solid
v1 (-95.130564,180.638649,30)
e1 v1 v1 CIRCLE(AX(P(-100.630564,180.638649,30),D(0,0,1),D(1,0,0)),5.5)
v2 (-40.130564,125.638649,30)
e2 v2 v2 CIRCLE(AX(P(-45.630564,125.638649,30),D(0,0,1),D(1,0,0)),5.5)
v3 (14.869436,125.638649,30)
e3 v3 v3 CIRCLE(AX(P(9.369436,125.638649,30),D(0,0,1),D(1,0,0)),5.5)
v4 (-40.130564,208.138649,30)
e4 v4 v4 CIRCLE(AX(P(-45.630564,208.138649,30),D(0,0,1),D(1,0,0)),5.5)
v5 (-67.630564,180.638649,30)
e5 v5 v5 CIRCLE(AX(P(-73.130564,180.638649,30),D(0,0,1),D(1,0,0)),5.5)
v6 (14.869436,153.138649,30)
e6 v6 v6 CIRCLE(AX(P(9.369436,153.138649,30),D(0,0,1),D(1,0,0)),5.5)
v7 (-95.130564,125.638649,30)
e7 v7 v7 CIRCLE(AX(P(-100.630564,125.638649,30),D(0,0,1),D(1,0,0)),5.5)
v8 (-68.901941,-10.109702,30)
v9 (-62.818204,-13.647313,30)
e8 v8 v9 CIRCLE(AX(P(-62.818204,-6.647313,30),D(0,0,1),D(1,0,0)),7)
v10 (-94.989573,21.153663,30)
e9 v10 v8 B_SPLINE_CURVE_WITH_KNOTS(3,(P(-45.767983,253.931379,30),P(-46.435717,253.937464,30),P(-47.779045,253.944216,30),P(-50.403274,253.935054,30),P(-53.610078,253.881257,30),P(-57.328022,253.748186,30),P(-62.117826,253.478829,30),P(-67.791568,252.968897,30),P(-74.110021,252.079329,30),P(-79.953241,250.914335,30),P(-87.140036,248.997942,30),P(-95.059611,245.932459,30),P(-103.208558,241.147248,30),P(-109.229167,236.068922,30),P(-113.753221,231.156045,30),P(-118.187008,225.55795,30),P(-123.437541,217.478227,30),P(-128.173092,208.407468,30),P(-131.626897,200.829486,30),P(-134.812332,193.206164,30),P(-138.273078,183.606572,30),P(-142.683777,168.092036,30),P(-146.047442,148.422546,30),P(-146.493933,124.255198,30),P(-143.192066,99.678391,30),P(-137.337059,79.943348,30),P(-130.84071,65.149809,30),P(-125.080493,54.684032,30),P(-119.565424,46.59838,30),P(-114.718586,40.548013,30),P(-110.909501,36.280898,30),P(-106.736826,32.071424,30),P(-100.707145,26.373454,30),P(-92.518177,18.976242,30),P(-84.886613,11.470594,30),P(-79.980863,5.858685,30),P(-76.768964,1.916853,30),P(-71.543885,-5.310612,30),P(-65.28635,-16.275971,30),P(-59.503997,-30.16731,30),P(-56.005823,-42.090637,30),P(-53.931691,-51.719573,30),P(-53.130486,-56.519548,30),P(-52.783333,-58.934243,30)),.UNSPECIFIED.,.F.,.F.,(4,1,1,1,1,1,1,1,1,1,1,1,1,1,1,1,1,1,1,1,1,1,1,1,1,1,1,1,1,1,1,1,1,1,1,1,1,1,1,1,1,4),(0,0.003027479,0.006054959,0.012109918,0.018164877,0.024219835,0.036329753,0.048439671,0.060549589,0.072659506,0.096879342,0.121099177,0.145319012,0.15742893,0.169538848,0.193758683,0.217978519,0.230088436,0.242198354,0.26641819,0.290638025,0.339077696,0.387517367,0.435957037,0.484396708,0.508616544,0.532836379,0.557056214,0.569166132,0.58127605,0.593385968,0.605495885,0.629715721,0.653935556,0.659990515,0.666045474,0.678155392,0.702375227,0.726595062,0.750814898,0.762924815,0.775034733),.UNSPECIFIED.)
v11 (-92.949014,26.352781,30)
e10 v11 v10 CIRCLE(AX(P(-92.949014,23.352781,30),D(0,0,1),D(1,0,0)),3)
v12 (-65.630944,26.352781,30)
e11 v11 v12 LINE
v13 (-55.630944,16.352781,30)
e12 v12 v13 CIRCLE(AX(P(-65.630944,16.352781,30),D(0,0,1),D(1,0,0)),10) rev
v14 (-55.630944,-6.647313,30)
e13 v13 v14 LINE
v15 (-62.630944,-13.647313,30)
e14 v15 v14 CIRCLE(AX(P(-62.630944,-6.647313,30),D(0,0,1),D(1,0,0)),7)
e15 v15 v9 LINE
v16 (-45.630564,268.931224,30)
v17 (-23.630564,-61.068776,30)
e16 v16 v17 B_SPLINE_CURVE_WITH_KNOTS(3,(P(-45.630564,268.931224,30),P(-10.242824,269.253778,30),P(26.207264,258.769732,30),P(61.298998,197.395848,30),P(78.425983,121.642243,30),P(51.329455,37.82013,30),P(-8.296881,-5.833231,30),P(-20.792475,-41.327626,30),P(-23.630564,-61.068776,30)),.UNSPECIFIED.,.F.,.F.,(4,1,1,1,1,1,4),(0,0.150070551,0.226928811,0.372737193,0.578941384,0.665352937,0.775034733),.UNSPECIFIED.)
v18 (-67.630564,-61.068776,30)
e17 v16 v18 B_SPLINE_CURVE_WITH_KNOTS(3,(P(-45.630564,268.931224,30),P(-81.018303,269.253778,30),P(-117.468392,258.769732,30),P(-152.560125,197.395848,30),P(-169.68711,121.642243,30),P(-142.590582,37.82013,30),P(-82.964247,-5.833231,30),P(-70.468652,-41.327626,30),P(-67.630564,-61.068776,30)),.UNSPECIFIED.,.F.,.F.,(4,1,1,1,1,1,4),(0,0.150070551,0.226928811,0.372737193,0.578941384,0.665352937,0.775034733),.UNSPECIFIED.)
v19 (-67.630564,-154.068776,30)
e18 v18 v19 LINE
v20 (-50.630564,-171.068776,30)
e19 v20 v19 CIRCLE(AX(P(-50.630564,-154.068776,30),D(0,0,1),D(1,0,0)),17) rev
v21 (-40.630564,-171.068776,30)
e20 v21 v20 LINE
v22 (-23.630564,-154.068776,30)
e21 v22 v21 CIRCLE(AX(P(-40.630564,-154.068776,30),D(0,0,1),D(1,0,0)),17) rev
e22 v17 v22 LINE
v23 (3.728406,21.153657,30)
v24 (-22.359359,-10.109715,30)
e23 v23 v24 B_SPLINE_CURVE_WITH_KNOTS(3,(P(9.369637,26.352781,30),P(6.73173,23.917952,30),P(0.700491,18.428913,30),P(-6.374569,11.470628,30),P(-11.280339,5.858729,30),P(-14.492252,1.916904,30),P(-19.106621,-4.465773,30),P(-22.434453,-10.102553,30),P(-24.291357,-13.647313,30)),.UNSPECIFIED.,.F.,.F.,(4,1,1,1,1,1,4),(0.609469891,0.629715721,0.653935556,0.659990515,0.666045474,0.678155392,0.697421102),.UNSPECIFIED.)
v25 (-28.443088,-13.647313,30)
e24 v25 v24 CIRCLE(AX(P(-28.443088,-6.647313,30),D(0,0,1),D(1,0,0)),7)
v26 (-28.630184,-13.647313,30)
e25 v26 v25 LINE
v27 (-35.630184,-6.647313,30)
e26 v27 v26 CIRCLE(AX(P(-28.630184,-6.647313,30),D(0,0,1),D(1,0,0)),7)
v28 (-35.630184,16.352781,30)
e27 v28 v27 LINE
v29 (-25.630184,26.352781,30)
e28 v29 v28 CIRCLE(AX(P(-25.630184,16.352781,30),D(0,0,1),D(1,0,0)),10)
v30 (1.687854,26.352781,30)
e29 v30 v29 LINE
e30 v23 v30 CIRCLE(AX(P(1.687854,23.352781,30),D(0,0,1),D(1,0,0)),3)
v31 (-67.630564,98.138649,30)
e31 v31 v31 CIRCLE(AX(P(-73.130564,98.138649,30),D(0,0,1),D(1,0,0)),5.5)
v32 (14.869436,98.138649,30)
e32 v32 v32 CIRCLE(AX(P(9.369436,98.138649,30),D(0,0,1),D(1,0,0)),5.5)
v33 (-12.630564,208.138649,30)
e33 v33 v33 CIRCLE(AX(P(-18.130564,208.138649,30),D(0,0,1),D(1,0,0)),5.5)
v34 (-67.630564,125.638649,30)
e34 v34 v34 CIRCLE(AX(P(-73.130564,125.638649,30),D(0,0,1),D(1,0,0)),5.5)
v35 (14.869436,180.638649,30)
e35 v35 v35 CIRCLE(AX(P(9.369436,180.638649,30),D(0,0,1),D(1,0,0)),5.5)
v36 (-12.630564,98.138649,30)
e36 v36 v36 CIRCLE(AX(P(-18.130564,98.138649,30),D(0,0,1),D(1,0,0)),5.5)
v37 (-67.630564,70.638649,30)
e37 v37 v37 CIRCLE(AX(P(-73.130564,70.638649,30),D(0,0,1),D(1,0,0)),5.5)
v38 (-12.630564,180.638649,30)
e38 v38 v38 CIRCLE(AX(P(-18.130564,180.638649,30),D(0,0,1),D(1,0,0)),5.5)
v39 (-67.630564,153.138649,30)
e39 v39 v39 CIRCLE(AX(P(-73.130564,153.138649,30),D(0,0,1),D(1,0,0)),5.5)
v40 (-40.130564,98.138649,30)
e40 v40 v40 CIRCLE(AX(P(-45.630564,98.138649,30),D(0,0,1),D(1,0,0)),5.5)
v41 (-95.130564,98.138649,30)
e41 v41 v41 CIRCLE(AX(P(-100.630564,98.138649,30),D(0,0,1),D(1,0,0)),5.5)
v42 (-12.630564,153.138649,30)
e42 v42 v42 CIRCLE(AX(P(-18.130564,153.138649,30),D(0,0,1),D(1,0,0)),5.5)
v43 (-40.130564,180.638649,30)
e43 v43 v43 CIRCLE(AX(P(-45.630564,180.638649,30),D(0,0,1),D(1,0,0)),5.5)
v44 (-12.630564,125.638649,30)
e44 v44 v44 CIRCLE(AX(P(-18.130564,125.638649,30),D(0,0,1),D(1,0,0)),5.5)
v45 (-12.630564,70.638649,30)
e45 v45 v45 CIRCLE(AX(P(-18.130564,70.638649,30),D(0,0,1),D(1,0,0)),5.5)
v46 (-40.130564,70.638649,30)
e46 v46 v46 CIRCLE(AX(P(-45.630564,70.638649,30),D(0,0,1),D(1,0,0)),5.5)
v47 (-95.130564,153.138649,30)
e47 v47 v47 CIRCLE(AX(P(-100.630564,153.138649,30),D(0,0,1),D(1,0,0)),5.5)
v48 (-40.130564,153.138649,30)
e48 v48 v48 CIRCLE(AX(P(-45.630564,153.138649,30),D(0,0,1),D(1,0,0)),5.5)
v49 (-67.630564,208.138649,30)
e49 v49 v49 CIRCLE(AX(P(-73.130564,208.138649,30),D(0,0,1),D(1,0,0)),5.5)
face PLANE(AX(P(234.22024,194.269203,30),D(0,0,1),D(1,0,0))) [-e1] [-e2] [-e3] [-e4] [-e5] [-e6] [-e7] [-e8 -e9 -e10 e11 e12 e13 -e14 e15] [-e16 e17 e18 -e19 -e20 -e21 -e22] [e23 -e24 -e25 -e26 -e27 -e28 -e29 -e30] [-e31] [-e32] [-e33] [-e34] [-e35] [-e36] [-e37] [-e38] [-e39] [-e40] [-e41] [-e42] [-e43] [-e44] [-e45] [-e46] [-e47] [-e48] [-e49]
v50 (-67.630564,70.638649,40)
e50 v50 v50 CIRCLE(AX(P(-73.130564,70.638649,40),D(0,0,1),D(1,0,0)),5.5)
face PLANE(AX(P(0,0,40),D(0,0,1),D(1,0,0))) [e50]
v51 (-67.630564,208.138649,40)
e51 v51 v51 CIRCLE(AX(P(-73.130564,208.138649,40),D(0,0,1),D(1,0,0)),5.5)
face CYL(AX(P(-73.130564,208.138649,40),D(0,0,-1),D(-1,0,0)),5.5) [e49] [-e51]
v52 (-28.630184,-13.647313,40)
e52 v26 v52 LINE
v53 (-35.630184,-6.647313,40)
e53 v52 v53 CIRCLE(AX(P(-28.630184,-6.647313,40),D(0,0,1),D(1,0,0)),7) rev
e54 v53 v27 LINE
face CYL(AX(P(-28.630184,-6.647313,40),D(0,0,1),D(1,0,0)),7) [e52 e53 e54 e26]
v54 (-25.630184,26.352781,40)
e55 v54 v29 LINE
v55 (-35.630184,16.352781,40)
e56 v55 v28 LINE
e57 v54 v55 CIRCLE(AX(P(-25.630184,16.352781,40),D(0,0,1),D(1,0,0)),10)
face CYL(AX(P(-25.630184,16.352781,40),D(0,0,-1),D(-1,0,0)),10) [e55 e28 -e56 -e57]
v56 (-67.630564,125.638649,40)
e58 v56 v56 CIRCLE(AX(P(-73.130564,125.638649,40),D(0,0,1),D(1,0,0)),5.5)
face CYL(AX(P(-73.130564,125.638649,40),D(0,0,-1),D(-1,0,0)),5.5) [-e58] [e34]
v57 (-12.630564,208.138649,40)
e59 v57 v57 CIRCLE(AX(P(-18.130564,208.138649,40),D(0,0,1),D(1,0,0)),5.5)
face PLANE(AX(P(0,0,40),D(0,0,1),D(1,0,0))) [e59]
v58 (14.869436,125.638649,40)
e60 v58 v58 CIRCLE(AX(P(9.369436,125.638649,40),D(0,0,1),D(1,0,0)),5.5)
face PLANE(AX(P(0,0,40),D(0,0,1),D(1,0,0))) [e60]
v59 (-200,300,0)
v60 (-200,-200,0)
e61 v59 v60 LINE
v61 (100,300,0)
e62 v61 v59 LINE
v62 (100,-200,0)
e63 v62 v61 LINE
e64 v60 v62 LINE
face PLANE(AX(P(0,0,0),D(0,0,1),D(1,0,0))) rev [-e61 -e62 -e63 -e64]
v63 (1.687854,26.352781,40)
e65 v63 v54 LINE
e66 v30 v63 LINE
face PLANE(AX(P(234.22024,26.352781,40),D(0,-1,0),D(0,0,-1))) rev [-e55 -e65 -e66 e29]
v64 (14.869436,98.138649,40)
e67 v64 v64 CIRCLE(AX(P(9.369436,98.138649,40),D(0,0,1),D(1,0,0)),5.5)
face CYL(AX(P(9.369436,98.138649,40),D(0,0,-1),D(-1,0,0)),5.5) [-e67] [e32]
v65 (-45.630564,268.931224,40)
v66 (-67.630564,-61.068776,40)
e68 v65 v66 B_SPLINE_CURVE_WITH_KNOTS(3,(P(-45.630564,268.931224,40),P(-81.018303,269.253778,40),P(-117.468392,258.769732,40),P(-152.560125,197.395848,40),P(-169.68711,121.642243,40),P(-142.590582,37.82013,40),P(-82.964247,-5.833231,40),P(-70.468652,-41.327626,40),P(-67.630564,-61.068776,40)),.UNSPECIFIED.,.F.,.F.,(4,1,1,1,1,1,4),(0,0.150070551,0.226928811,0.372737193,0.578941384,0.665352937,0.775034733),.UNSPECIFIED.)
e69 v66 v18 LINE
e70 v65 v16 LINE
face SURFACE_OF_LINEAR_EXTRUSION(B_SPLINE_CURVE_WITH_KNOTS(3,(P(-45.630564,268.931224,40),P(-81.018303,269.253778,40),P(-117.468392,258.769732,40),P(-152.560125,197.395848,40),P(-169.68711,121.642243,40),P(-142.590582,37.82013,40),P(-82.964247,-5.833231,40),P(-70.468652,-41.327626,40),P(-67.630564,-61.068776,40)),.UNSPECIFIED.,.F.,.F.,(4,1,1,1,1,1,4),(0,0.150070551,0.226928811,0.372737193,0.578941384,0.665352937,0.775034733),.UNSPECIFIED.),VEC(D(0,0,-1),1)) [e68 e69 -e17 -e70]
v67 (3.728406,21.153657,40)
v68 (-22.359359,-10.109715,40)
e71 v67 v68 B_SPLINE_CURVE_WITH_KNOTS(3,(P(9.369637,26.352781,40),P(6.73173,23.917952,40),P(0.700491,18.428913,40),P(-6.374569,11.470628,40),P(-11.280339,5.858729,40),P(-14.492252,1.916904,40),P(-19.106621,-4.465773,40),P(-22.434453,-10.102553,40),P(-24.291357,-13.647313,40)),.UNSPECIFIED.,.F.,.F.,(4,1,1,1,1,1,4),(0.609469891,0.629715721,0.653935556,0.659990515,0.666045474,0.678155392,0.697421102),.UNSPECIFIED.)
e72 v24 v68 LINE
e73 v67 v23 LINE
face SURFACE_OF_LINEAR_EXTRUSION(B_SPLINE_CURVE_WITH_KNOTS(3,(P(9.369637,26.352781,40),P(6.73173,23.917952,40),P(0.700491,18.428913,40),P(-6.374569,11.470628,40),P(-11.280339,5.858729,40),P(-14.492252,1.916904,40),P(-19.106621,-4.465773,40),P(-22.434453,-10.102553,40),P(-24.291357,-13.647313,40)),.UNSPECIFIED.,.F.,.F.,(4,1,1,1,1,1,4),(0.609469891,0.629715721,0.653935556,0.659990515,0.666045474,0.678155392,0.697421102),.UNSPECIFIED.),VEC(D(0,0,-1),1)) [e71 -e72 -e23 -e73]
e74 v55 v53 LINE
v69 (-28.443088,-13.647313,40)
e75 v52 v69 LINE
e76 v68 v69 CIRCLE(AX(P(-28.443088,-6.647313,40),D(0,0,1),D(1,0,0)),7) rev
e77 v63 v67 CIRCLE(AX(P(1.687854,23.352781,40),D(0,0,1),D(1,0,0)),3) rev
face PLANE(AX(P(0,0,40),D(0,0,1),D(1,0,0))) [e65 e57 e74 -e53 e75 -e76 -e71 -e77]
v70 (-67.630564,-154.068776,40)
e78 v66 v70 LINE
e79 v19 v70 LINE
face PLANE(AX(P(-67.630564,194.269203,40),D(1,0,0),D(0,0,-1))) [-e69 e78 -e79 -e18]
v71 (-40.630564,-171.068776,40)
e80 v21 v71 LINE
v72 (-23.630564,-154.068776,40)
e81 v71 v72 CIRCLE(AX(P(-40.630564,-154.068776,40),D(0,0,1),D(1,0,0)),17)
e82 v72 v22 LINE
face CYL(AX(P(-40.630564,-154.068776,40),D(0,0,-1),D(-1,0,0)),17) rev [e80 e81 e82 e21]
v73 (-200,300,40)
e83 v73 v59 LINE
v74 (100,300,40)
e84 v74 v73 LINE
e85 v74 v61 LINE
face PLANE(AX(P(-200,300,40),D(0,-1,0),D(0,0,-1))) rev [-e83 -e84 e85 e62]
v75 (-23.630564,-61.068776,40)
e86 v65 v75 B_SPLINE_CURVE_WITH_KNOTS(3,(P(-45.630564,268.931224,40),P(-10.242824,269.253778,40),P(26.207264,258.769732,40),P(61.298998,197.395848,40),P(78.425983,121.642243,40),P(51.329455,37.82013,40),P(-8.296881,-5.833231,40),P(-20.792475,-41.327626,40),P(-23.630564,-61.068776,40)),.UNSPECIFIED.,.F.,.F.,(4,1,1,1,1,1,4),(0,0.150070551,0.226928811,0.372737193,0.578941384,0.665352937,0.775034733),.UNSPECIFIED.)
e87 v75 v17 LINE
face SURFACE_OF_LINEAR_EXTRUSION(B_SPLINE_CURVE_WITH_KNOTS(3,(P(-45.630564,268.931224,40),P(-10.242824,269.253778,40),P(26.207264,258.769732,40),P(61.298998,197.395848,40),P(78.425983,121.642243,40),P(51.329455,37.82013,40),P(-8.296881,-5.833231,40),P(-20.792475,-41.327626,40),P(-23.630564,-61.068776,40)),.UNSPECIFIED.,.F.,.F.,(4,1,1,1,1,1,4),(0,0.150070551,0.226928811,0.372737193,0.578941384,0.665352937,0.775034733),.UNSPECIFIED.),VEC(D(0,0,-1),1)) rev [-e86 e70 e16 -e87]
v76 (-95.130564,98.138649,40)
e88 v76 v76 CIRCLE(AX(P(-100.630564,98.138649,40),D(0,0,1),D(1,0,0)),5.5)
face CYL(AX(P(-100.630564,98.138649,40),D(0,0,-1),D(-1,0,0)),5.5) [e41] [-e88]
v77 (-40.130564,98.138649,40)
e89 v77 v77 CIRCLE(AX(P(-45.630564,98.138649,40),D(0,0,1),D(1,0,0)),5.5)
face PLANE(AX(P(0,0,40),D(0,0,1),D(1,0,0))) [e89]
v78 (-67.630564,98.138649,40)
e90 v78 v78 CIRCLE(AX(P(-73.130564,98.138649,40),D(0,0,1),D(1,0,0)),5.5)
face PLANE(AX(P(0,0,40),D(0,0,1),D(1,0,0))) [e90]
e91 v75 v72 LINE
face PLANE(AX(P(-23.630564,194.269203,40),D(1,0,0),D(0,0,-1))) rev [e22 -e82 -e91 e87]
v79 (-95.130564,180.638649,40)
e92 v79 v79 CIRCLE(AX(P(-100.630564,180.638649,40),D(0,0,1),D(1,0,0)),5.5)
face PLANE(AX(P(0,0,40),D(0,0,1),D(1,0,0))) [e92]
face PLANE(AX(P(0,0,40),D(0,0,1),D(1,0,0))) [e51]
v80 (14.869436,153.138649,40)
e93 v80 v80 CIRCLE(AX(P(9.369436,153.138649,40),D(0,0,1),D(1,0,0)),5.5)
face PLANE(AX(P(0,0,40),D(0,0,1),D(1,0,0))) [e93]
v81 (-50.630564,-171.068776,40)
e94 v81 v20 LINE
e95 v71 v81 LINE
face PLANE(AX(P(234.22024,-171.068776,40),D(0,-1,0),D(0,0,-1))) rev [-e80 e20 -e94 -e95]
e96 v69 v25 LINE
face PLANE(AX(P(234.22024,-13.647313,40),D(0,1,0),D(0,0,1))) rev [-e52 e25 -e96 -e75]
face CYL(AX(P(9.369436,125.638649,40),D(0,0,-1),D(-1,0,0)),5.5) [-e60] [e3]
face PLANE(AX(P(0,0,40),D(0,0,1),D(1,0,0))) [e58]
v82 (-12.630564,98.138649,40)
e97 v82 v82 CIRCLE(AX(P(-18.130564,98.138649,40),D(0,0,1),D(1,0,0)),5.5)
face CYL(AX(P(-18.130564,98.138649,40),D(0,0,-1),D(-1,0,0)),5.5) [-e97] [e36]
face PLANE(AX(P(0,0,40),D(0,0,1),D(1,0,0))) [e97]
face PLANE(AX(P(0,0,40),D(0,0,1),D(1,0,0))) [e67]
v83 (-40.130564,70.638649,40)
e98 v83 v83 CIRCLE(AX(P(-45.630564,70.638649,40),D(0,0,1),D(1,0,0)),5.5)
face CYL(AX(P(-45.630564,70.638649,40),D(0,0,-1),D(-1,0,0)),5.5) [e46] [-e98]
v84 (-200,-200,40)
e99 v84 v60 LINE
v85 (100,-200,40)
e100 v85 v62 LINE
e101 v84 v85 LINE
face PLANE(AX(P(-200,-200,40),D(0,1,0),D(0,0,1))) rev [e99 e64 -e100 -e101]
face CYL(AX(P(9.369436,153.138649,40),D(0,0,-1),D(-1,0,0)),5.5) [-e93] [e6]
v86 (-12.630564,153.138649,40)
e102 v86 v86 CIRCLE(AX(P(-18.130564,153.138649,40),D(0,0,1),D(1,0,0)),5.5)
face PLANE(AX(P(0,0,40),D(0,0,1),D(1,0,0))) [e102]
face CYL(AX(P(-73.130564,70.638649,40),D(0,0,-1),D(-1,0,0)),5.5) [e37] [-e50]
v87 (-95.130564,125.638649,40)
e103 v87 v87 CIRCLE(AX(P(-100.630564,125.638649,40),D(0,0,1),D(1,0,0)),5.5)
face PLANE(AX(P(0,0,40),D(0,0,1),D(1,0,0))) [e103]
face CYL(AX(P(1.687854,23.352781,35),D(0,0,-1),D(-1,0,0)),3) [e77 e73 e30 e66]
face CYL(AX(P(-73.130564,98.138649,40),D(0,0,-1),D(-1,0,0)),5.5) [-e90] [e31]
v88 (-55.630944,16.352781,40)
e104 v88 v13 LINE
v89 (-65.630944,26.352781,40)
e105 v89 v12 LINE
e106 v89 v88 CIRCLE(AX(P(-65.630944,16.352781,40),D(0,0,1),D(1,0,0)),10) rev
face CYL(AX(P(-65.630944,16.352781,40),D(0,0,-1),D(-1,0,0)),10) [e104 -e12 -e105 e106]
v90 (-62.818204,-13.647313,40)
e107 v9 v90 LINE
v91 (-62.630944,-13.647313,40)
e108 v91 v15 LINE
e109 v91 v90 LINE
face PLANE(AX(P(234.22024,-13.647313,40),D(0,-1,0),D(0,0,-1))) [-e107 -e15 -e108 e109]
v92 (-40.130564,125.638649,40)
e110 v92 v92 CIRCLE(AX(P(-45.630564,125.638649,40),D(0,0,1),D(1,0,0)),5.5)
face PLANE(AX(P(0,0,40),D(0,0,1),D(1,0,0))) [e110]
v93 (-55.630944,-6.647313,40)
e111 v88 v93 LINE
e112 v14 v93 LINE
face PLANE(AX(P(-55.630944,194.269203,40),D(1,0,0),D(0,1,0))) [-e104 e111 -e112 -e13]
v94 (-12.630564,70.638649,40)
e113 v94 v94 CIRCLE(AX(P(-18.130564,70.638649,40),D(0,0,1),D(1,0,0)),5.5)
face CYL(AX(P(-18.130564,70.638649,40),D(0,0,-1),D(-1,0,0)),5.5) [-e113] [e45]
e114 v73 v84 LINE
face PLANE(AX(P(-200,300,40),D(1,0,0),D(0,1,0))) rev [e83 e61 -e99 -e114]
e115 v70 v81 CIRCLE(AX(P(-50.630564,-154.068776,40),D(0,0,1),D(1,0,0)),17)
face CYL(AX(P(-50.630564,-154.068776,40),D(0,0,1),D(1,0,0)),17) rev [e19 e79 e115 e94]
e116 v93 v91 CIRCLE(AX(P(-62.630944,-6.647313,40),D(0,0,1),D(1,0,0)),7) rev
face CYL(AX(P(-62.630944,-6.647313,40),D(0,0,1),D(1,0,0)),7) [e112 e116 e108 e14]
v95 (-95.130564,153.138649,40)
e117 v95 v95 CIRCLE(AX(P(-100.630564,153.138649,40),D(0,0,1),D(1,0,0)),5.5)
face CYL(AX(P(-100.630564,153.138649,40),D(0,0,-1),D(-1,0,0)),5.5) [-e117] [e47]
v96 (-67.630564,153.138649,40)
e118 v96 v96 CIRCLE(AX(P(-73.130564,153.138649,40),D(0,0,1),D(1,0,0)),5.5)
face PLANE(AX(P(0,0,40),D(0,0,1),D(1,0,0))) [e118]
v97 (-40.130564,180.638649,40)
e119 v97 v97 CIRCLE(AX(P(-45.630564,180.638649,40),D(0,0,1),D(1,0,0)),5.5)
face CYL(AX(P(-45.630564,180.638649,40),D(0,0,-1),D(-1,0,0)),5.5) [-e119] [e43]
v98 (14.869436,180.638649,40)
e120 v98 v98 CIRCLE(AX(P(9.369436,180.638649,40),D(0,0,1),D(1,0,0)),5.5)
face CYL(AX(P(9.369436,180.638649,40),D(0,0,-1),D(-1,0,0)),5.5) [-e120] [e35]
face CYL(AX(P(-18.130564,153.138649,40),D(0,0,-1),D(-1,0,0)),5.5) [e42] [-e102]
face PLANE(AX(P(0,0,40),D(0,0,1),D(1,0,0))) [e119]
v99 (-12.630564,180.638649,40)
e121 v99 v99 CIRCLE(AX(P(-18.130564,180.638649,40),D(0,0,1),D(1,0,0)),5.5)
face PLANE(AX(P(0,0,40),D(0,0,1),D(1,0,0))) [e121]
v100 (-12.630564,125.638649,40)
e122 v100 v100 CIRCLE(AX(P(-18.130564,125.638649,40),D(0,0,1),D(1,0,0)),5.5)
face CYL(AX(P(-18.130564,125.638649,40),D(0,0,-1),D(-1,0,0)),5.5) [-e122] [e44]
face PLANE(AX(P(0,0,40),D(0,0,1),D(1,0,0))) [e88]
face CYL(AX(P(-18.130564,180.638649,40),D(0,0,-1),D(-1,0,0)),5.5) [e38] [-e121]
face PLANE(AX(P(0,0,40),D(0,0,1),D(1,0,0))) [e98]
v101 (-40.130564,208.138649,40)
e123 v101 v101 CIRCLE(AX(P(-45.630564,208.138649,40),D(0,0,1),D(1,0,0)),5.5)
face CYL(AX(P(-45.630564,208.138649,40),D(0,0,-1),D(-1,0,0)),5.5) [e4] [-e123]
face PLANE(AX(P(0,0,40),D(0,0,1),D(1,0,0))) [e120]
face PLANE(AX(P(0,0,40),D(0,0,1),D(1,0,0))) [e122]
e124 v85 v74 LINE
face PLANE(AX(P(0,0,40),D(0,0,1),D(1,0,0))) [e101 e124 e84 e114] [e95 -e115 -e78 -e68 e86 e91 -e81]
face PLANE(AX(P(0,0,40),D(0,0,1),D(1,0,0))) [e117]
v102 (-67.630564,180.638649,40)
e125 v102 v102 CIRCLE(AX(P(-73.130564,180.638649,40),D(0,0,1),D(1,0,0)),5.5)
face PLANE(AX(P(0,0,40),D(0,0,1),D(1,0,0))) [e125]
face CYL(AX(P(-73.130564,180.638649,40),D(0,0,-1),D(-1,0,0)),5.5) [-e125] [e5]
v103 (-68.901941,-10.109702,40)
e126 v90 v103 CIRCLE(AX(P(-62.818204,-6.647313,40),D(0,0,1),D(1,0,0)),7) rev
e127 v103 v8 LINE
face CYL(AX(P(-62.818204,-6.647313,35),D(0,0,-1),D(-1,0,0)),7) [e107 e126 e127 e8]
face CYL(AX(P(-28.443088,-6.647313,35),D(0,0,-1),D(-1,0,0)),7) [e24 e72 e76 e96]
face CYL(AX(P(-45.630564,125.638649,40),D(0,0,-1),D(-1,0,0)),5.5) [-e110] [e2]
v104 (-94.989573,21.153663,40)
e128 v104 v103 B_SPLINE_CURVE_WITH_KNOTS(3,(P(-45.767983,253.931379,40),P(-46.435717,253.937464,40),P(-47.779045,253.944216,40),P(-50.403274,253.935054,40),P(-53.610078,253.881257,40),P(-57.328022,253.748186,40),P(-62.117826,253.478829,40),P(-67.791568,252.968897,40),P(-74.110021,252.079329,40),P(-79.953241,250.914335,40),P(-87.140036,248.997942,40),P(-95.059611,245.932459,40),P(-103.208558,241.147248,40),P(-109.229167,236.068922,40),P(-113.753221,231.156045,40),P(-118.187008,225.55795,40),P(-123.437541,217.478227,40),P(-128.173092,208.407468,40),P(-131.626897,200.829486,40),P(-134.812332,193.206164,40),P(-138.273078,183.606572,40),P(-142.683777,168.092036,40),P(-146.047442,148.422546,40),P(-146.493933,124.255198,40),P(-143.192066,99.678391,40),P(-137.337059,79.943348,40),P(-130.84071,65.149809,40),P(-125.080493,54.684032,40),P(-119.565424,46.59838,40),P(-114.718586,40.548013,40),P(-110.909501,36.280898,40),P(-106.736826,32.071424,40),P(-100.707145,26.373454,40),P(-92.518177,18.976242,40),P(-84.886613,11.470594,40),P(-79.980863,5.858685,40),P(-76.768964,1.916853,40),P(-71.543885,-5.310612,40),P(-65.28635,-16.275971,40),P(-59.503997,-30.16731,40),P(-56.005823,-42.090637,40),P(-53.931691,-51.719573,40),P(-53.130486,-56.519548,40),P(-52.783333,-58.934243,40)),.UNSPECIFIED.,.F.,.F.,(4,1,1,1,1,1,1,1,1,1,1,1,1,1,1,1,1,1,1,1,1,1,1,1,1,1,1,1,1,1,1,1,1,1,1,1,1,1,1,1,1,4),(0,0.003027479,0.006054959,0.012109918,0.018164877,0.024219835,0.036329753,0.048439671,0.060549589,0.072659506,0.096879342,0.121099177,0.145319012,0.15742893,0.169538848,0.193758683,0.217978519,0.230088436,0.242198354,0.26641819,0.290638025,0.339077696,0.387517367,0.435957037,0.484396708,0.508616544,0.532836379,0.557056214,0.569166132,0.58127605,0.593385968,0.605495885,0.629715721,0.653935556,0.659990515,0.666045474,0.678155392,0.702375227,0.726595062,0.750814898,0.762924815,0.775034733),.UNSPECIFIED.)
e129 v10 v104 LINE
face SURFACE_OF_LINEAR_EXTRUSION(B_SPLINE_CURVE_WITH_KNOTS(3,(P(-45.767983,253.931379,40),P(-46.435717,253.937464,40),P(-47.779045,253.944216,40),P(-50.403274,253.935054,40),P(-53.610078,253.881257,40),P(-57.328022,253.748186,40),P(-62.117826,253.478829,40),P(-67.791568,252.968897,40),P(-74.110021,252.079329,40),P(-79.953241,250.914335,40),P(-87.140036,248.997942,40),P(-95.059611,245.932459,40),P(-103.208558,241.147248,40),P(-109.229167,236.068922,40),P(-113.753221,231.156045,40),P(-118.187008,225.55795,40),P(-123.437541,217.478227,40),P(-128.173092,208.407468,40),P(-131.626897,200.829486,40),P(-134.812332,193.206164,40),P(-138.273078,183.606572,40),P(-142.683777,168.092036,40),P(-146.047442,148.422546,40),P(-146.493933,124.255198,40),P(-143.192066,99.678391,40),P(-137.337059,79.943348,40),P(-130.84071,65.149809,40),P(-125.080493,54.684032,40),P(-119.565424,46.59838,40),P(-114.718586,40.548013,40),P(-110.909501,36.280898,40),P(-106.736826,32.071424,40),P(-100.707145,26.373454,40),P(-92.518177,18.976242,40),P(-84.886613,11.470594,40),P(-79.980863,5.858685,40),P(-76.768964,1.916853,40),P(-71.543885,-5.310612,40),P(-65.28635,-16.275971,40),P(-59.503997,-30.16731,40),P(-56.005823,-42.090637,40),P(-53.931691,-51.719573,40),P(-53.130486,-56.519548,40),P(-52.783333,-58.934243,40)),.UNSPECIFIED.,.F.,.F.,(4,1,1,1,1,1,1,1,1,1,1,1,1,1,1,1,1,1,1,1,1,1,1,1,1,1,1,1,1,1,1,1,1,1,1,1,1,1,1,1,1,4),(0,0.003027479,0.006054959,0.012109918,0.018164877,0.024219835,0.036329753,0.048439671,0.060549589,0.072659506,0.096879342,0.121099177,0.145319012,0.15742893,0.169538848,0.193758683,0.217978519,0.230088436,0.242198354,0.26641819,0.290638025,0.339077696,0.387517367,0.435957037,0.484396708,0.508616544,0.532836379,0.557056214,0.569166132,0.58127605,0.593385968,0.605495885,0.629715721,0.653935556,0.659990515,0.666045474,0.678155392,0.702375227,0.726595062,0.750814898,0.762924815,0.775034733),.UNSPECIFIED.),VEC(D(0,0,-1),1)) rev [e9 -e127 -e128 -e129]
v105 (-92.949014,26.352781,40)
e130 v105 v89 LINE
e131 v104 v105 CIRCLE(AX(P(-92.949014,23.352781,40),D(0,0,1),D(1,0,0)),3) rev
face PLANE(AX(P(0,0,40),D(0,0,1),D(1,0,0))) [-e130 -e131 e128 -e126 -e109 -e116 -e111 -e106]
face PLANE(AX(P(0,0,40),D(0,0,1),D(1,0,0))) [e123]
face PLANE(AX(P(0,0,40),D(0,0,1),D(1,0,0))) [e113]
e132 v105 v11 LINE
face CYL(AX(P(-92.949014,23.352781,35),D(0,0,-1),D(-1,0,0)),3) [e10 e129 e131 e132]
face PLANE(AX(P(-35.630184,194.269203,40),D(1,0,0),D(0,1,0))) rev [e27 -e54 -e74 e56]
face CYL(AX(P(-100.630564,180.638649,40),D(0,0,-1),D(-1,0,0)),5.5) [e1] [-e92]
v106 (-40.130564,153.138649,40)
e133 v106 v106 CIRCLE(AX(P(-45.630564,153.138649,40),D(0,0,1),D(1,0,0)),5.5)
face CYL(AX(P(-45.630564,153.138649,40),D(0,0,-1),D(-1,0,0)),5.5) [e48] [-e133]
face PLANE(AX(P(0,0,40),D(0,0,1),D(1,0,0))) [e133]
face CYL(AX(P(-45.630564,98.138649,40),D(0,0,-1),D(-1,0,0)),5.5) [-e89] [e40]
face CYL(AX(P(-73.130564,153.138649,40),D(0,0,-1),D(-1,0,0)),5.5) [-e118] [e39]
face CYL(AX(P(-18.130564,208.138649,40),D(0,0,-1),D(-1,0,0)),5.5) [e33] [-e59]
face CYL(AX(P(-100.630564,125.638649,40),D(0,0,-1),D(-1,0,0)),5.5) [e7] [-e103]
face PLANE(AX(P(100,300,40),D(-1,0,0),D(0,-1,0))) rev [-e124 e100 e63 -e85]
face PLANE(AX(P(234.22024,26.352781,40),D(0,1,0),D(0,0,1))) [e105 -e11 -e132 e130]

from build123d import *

# Parameters (mm, degrees)
SCHIZZO1_W                   = 300
SCHIZZO1_H                   = 500
ESTRUSIONE_ESTRUSIONE1_DEPTH = 40
CAVIT_1_START                = 30
CAVIT_1_OUTLINE_R            = 5.5
CAVIT_1_DEPTH                = 10


# Read off the part's stored shape, not the designer's step: Cavità1
with BuildPart() as part:
    # Schizzo1 → Estrusione-Estrusione1 (new body)
    with BuildSketch(Plane.XY):
        with Locations((-50, 50)):
            Rectangle(SCHIZZO1_W, SCHIZZO1_H)
    extrude(amount=ESTRUSIONE_ESTRUSIONE1_DEPTH)

    # Cavità1 outline → Cavità1 (cut)
    with BuildSketch(Plane.XY.offset(CAVIT_1_START)):
        with BuildLine():
            add(Edge.make_bspline(
                [(-45.630563704, 268.931224179), (-10.242824482, 269.253777995), (26.207264329, 258.769731776), (61.298997523, 197.395847805), (78.425982638, 121.642243114), (51.329454916, 37.820129659), (-8.296880797, -5.833230992), (-20.792475043, -41.327625634), (-23.630563704, -61.068775821)],
                knots=[0, 0, 0, 0, 0.150070551, 0.226928811, 0.372737193, 0.578941384, 0.665352937, 0.775034733, 0.775034733, 0.775034733, 0.775034733], degree=3))
            add(Edge.make_bspline(
                [(-45.630563704, 268.931224179), (-81.018302926, 269.253777995), (-117.468391737, 258.769731776), (-152.560124931, 197.395847805), (-169.687110046, 121.642243114), (-142.590582324, 37.820129659), (-82.96424661, -5.833230992), (-70.468652365, -41.327625634), (-67.630563704, -61.068775821)],
                knots=[0, 0, 0, 0, 0.150070551, 0.226928811, 0.372737193, 0.578941384, 0.665352937, 0.775034733, 0.775034733, 0.775034733, 0.775034733], degree=3))
            Line((-67.630563704, -61.068775821), (-67.630563704, -154.068775821))
            ThreePointArc((-67.630563704, -154.068775821), (-62.651378984, -166.089591101), (-50.630563704, -171.068775821))
            Line((-50.630563704, -171.068775821), (-40.630563704, -171.068775821))
            ThreePointArc((-40.630563704, -171.068775821), (-28.609748424, -166.089591101), (-23.630563704, -154.068775821))
            Line((-23.630563704, -154.068775821), (-23.630563704, -61.068775821))
        make_face()
        with BuildLine():
            add(Edge.make_bspline(
                [(-94.989572549, 21.153662791), (-94.15142809, 20.375950025), (-89.988702943, 16.48850239), (-84.886613244, 11.470594112), (-79.980862553, 5.858684547), (-76.768963888, 1.916853126), (-72.951216506, -3.363954472), (-70.22044574, -7.792969084), (-68.901941305, -10.109702474)],
                knots=[0.623558075, 0.623558075, 0.623558075, 0.623558075, 0.629715721, 0.653935556, 0.659990515, 0.666045474, 0.678155392, 0.690959257, 0.690959257, 0.690959257, 0.690959257], degree=3))
            ThreePointArc((-94.989572549, 21.153662791), (-95.741625635, 24.448829767), (-92.949014353, 26.352781308))
            Line((-92.949014353, 26.352781308), (-65.630943606, 26.352781308))
            ThreePointArc((-65.630943606, 26.352781308), (-58.559875794, 23.42384912), (-55.630943606, 16.352781308))
            Line((-55.630943606, 16.352781308), (-55.630943606, -6.647312588))
            ThreePointArc((-55.630943606, -6.647312588), (-57.681196138, -11.597060056), (-62.630943606, -13.647312588))
            Line((-62.630943606, -13.647312588), (-62.818204273, -13.647312588))
            ThreePointArc((-62.818204273, -13.647312588), (-66.336959081, -12.69862357), (-68.901941305, -10.109702474))
        make_face(mode=Mode.SUBTRACT)
        with BuildLine():
            ThreePointArc((1.687854421, 26.352781308), (4.480467254, 24.448825814), (3.728406391, 21.153657015))
            add(Edge.make_bspline(
                [(3.728406391, 21.153657015), (2.890265485, 20.375951961), (-1.272467578, 16.488519054), (-6.374568867, 11.470628296), (-11.280339412, 5.858728651), (-14.492251846, 1.916903523), (-18.310034758, -3.363921174), (-21.040833914, -7.792957432), (-22.359358711, -10.109715267)],
                knots=[0.623558123, 0.623558123, 0.623558123, 0.623558123, 0.629715721, 0.653935556, 0.659990515, 0.666045474, 0.678155392, 0.690959399, 0.690959399, 0.690959399, 0.690959399], degree=3))
            ThreePointArc((-22.359358711, -10.109715267), (-24.924340017, -12.69862727), (-28.443088463, -13.647312588))
            Line((-28.443088463, -13.647312588), (-28.630183802, -13.647312588))
            ThreePointArc((-28.630183802, -13.647312588), (-33.57993127, -11.597060056), (-35.630183802, -6.647312588))
            Line((-35.630183802, -6.647312588), (-35.630183802, 16.352781308))
            ThreePointArc((-35.630183802, 16.352781308), (-32.701251613, 23.423849119), (-25.630183802, 26.352781308))
            Line((-25.630183802, 26.352781308), (1.687854421, 26.352781308))
        make_face(mode=Mode.SUBTRACT)
        with Locations((-100.630563704, 98.138648944)):
            Circle(CAVIT_1_OUTLINE_R, mode=Mode.SUBTRACT)
        with Locations((-73.130563704, 70.638648944)):
            Circle(CAVIT_1_OUTLINE_R, mode=Mode.SUBTRACT)
        with Locations((-45.630563704, 70.638648944)):
            Circle(CAVIT_1_OUTLINE_R, mode=Mode.SUBTRACT)
        with Locations((-73.130563704, 98.138648944)):
            Circle(CAVIT_1_OUTLINE_R, mode=Mode.SUBTRACT)
        with Locations((-45.630563704, 98.138648944)):
            Circle(CAVIT_1_OUTLINE_R, mode=Mode.SUBTRACT)
        with Locations((-100.630563704, 125.638648944)):
            Circle(CAVIT_1_OUTLINE_R, mode=Mode.SUBTRACT)
        with Locations((-100.630563704, 153.138648944)):
            Circle(CAVIT_1_OUTLINE_R, mode=Mode.SUBTRACT)
        with Locations((-73.130563704, 125.638648944)):
            Circle(CAVIT_1_OUTLINE_R, mode=Mode.SUBTRACT)
        with Locations((-45.630563704, 125.638648944)):
            Circle(CAVIT_1_OUTLINE_R, mode=Mode.SUBTRACT)
        with Locations((-73.130563704, 153.138648944)):
            Circle(CAVIT_1_OUTLINE_R, mode=Mode.SUBTRACT)
        with Locations((-45.630563704, 153.138648944)):
            Circle(CAVIT_1_OUTLINE_R, mode=Mode.SUBTRACT)
        with Locations((-100.630563704, 180.638648944)):
            Circle(CAVIT_1_OUTLINE_R, mode=Mode.SUBTRACT)
        with Locations((-73.130563704, 180.638648944)):
            Circle(CAVIT_1_OUTLINE_R, mode=Mode.SUBTRACT)
        with Locations((-45.630563704, 180.638648944)):
            Circle(CAVIT_1_OUTLINE_R, mode=Mode.SUBTRACT)
        with Locations((-73.130563704, 208.138648944)):
            Circle(CAVIT_1_OUTLINE_R, mode=Mode.SUBTRACT)
        with Locations((-45.630563704, 208.138648944)):
            Circle(CAVIT_1_OUTLINE_R, mode=Mode.SUBTRACT)
        with Locations((-18.130563704, 70.638648944)):
            Circle(CAVIT_1_OUTLINE_R, mode=Mode.SUBTRACT)
        with Locations((-18.130563704, 98.138648944)):
            Circle(CAVIT_1_OUTLINE_R, mode=Mode.SUBTRACT)
        with Locations((9.369436296, 98.138648944)):
            Circle(CAVIT_1_OUTLINE_R, mode=Mode.SUBTRACT)
        with Locations((-18.130563704, 125.638648944)):
            Circle(CAVIT_1_OUTLINE_R, mode=Mode.SUBTRACT)
        with Locations((-18.130563704, 153.138648944)):
            Circle(CAVIT_1_OUTLINE_R, mode=Mode.SUBTRACT)
        with Locations((9.369436296, 125.638648944)):
            Circle(CAVIT_1_OUTLINE_R, mode=Mode.SUBTRACT)
        with Locations((9.369436296, 153.138648944)):
            Circle(CAVIT_1_OUTLINE_R, mode=Mode.SUBTRACT)
        with Locations((-18.130563704, 180.638648944)):
            Circle(CAVIT_1_OUTLINE_R, mode=Mode.SUBTRACT)
        with Locations((-18.130563704, 208.138648944)):
            Circle(CAVIT_1_OUTLINE_R, mode=Mode.SUBTRACT)
        with Locations((9.369436296, 180.638648944)):
            Circle(CAVIT_1_OUTLINE_R, mode=Mode.SUBTRACT)
    extrude(amount=CAVIT_1_DEPTH, mode=Mode.SUBTRACT)


solid = part.part
